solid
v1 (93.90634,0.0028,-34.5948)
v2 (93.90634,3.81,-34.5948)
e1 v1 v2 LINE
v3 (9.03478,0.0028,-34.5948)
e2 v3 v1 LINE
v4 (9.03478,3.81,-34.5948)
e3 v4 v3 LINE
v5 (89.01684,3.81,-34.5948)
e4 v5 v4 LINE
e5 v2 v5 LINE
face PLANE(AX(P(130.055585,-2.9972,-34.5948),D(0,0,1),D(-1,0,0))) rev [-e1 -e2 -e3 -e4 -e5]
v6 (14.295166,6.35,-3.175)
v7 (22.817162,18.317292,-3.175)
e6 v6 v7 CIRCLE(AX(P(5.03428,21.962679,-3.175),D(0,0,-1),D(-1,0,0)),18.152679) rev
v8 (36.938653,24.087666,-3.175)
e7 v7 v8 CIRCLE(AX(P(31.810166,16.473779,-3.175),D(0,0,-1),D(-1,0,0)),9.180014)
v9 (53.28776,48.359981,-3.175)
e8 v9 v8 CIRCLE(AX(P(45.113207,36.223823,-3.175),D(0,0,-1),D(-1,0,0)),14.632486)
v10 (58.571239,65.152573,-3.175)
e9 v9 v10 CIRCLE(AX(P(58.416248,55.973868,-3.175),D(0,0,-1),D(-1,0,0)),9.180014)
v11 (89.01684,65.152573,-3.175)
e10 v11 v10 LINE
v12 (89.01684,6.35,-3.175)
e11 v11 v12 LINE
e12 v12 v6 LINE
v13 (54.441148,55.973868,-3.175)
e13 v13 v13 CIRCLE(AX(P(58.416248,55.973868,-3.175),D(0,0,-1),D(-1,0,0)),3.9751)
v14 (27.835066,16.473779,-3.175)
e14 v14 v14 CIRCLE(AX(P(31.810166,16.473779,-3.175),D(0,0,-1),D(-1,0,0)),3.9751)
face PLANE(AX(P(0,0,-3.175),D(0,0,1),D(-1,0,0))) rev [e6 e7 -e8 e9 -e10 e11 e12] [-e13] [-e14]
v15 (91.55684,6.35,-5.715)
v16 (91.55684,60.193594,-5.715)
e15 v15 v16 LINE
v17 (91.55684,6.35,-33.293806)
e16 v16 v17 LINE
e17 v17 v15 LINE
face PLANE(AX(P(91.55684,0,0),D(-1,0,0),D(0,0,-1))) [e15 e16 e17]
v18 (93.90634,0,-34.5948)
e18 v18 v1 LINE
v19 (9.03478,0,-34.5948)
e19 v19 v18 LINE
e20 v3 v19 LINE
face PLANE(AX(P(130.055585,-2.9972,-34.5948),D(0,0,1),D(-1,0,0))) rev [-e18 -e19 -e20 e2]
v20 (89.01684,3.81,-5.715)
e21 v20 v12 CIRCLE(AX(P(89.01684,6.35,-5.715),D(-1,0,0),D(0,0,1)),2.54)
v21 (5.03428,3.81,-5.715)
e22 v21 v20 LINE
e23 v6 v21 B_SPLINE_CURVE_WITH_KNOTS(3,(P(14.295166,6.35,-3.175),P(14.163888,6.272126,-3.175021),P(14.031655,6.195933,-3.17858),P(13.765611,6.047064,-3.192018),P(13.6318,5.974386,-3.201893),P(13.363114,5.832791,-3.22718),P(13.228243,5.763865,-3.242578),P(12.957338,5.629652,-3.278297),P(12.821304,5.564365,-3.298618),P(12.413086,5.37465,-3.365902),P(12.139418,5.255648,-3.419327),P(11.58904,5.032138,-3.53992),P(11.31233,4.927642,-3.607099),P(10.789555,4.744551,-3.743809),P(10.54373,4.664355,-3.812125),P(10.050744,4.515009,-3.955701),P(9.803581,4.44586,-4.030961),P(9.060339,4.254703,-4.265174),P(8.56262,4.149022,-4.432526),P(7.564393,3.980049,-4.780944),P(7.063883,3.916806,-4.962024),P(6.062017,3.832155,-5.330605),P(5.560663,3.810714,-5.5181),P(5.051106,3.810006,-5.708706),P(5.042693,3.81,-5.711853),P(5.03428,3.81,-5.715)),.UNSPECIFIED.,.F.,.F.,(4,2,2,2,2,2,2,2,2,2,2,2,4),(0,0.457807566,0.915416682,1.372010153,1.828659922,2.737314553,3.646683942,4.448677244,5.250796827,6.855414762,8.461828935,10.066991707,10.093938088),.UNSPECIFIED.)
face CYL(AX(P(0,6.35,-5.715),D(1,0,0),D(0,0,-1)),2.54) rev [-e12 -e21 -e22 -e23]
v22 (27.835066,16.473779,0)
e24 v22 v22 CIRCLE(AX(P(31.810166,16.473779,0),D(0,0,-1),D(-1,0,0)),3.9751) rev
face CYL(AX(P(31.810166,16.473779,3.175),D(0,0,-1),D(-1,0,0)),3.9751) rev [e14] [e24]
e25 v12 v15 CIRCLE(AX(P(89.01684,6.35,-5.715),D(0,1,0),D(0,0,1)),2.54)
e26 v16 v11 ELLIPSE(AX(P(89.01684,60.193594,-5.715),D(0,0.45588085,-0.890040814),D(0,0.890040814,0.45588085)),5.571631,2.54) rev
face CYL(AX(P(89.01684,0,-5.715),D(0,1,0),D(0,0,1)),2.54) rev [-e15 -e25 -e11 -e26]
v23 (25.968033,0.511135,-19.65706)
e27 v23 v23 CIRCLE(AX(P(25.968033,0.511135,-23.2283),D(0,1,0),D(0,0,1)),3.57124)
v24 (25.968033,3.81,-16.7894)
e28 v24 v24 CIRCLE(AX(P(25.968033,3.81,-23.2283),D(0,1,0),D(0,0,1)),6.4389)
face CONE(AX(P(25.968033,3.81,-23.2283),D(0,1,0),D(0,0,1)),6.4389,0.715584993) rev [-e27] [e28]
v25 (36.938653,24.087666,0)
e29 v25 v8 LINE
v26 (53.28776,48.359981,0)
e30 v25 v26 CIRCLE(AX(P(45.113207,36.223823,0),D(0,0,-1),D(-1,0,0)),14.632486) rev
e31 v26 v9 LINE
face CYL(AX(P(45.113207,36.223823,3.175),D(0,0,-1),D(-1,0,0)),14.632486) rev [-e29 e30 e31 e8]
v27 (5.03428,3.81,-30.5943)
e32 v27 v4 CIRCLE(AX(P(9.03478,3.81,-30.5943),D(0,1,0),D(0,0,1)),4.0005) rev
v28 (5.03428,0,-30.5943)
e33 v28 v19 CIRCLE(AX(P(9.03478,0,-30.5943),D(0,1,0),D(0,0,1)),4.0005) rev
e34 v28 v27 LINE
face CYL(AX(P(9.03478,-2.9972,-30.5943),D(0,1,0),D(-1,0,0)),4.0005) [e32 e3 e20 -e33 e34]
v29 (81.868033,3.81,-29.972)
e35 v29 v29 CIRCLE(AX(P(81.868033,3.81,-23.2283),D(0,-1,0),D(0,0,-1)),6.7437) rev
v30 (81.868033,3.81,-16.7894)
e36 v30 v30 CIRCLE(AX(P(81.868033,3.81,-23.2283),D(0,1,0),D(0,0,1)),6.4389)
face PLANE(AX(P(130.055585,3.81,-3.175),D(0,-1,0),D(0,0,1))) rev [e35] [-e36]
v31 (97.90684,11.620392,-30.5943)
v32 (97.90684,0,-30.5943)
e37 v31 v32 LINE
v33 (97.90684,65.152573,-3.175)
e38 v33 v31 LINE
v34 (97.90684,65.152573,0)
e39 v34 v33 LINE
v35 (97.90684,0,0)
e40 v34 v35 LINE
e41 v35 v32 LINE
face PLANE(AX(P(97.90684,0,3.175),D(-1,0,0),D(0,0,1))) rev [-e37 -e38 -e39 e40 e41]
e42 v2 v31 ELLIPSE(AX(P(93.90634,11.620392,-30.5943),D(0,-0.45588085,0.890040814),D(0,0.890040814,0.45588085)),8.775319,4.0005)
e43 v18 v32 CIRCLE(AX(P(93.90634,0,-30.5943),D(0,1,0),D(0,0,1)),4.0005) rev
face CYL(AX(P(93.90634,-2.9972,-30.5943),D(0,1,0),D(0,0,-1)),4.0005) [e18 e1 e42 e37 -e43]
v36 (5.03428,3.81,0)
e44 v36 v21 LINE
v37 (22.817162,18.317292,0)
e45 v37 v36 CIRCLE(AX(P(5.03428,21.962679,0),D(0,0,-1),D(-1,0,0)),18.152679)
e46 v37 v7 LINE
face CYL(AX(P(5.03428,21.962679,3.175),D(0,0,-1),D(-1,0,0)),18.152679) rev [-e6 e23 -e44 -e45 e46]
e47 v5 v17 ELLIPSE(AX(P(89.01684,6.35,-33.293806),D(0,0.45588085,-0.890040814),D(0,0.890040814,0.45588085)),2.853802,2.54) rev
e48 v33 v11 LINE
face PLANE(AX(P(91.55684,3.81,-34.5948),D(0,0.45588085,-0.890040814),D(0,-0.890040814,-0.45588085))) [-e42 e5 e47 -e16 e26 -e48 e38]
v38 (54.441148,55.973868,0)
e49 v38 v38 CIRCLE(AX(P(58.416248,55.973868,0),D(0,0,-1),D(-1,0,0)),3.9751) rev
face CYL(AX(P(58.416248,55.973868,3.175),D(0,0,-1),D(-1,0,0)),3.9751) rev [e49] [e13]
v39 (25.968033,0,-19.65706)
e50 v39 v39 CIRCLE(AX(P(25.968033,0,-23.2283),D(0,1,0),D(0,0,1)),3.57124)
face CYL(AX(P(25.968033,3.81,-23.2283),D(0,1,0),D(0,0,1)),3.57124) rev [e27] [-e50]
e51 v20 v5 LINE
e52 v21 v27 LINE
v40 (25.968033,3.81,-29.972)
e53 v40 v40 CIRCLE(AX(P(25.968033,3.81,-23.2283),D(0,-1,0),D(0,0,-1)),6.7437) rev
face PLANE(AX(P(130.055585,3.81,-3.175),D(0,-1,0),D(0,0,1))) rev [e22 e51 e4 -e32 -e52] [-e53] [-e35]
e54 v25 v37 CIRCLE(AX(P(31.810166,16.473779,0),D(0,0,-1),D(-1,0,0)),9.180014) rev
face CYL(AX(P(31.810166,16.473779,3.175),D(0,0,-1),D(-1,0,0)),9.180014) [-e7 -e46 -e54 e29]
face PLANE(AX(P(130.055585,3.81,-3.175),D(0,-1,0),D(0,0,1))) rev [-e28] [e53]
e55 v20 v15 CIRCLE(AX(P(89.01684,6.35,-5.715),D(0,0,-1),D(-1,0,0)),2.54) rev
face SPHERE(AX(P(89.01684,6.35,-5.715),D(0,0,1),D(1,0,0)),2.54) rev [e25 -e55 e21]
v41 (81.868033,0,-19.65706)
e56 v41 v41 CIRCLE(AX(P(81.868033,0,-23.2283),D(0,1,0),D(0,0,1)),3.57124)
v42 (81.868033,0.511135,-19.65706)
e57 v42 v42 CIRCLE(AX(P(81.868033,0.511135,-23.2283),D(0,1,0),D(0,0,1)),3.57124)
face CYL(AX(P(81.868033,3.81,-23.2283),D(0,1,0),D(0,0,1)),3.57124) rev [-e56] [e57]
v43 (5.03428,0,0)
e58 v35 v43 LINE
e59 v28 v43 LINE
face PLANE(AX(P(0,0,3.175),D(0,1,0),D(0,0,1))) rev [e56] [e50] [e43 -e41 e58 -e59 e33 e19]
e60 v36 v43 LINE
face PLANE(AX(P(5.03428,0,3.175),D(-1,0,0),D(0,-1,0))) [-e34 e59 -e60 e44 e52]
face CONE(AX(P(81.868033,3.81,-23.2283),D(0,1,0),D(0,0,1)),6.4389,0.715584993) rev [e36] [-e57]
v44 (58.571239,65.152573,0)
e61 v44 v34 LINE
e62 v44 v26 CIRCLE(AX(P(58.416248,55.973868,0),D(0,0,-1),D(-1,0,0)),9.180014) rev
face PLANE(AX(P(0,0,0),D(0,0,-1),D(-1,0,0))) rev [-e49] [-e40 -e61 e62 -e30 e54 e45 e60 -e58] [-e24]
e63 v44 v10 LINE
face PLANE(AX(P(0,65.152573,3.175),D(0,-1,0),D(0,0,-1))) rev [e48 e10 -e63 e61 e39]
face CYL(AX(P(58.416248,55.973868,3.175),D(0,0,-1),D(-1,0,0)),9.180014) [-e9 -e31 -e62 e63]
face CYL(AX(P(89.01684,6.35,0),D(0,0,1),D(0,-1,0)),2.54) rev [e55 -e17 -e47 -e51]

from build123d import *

# Parameters (mm, degrees)
SKETCH2_W                                   = 101.6
SKETCH2_H                                   = 127
BOSS_EXTRUDE1_DEPTH                         = 3.175
SKETCH5_R                                   = 3.9751
CUT_EXTRUDE1_DEPTH                          = 3.175
BOSS_EXTRUDE3_DEPTH                         = 92.87256
BOSS_EXTRUDE4_DEPTH                         = 6.35
SKETCH18_R                                  = 3.175
CUT_EXTRUDE3_DEPTH                          = 6.8072
FILLET4_R                                   = 4.0005
CUT_EXTRUDE4_DEPTH                          = 34.5948
CUT_EXTRUDE5_DEPTH                          = 2.9972
FILLET7_R                                   = 2.54
CSK_FOR_1_4_FLAT_HEAD_MACHINE_SCREW_2_COUNT = 2
CSK_FOR_1_4_FLAT_HEAD_MACHINE_SCREW_2_PITCH = 55.9


with BuildPart() as part:
    # Sketch2 → Boss-Extrude1 (new body)
    with BuildSketch(Plane.XY):
        with Locations((50.8, 63.5)):
            Rectangle(SKETCH2_W, SKETCH2_H)
    extrude(amount=BOSS_EXTRUDE1_DEPTH)

    # Sketch5 → Cut-Extrude1 (cut)
    with BuildSketch(Plane(origin=(0, 0, 0), x_dir=(-1, 0, 0), z_dir=(0, 0, -1))):
        with BuildLine():
            Line((-81.586228812, 65.152573183), (-58.571239337, 65.152573183))
            ThreePointArc((-58.571239337, 65.152573183), (-49.65943867, 58.729036089), (-53.287760408, 48.359981104))
            ThreePointArc((-53.287760408, 48.359981104), (-57.249364207, 28.049269577), (-36.93865268, 24.087665778))
            ThreePointArc((-36.93865268, 24.087665778), (-28.337713232, 24.971703827), (-22.817162059, 18.317291951))
            ThreePointArc((-22.817162059, 18.317291951), (-16.509170131, 7.896881921), (-5.03428, 3.81))
            Line((-5.03428, 3.81), (-5.03428, 0))
            Line((-5.03428, 0), (0, 0))
            Line((0, 0), (0, 127))
            Line((0, 127), (-101.6, 127))
            Line((-101.6, 127), (-101.6, 0))
            Line((-101.6, 0), (-97.90684, 0))
            Line((-97.90684, 0), (-97.90684, 65.152573183))
            Line((-97.90684, 65.152573183), (-81.586228812, 65.152573183))
        make_face()
        with Locations((-58.416247506, 55.973867932)):
            Circle(SKETCH5_R)
        with Locations((-31.810165582, 16.473778949)):
            Circle(SKETCH5_R)
    extrude(amount=-CUT_EXTRUDE1_DEPTH, mode=Mode.SUBTRACT)

    # Sketch10 → Boss-Extrude3 (add)
    with BuildSketch(Plane(origin=(5.03428, 0, 0), x_dir=(0, 0, -1), z_dir=(1, 0, 0))):
        Polygon((-3.175, 0), (-4.2418, 0), (-4.2418, -2.9972), (-34.5948, -2.9972), (-34.5948, 0), (-34.5948, 3.81), (-3.175, 3.81), align=None)
    extrude(amount=BOSS_EXTRUDE3_DEPTH)

    # Sketch11 → Boss-Extrude4 (add)
    with BuildSketch(Plane(origin=(97.90684, 0, 0), x_dir=(0, 0, -1), z_dir=(1, 0, 0))):
        Polygon((-3.175, 65.152573183), (-3.175, 3.81), (-34.5948, 3.81), align=None)
    extrude(amount=-BOSS_EXTRUDE4_DEPTH)

    # Sketch18 → Cut-Extrude3 (cut)
    with BuildSketch(Plane.XZ.offset(2.9972)):
        with Locations(Location((25.968032816, 23.228300068, 0), (0, 0, 270))):
            Circle(SKETCH18_R)
        with Locations(Location((81.868032816, 23.228300068, 0), (0, 0, 270))):
            Circle(SKETCH18_R)
    extrude(amount=-CUT_EXTRUDE3_DEPTH, mode=Mode.SUBTRACT)

    # Fillet4
    fillet4_edges = [part.edges().sort_by_distance(p)[0] for p in [
        (97.90684, -1.4986, 4.2418),
        (5.03428, -1.4986, 4.2418),
        (97.90684, 0.4064, 34.5948),
        (5.03428, 0.4064, 34.5948),
    ]]
    fillet(fillet4_edges, radius=FILLET4_R)

    # Mirror5: part across plane


with BuildPart() as part_1:
    add(part.part)
    add(part.part.mirror(Plane.XY))

    # Sketch25 → Cut-Extrude4 (cut)
    with BuildSketch(Plane.XY):
        Polygon((105.475480197, -15.241589329), (106.840773124, 71.833759528), (-8.541984089, 73.642896836), (-9.907277015, -13.432452021), align=None)
    extrude(amount=CUT_EXTRUDE4_DEPTH, mode=Mode.SUBTRACT)

    # Sketch28 → Cut-Extrude5 (cut)
    with BuildSketch(Plane.XZ.offset(2.9972)):
        with BuildLine():
            Line((93.90634, -4.2418), (9.03478, -4.2418))
            ThreePointArc((9.03478, -4.2418), (6.205999322, -5.413519322), (5.03428, -8.2423))
            Line((5.03428, -8.2423), (5.03428, -30.5943))
            ThreePointArc((5.03428, -30.5943), (6.205999322, -33.423080678), (9.03478, -34.5948))
            Line((9.03478, -34.5948), (93.90634, -34.5948))
            ThreePointArc((93.90634, -34.5948), (96.735120678, -33.423080678), (97.90684, -30.5943))
            Line((97.90684, -30.5943), (97.90684, -8.2423))
            ThreePointArc((97.90684, -8.2423), (96.735120678, -5.413519322), (93.90634, -4.2418))
        make_face()
    extrude(amount=-CUT_EXTRUDE5_DEPTH, mode=Mode.SUBTRACT)

    # Fillet7
    # the kernel refuses this fillet: 2.54 mm, written as the material it adds along each edge
    with BuildSketch(Plane(origin=(89.01684, 6.35, -5.715), x_dir=(0, -1, 0), z_dir=(1, 0, 0))) as fillet7_piece_1_section:
        Polygon((0, 0), (FILLET7_R, 0), (FILLET7_R, -FILLET7_R), (0, -FILLET7_R), align=None)
    fillet7_piece_1 = extrude(amount=FILLET7_R, mode=Mode.PRIVATE)
    fillet7_piece_1 = fillet7_piece_1 - Plane(origin=(89.01684, 6.35, -5.715), x_dir=(0, 0.7071067811865475, -0.7071067811865477), z_dir=(1, 0, 0)) * Sphere(FILLET7_R, mode=Mode.PRIVATE)
    add(fillet7_piece_1)
    with BuildSketch(Plane(origin=(5.03428, 3.81, -3.175), x_dir=(0, 0, -1), z_dir=(1, 0, 0))) as fillet7_piece_2_section:
        with BuildLine():
            CenterArc((FILLET7_R, FILLET7_R), FILLET7_R, 180, 90)
            Line((0, FILLET7_R), (0, 0))
            Line((0, 0), (FILLET7_R, 0))
        make_face()
    fillet7_piece_2 = extrude(amount=83.98256, mode=Mode.PRIVATE)
    fillet7_piece_2 = fillet7_piece_2 - Plane(origin=(5.03428, 21.962678524, -3.760034689), x_dir=(0.9796285454928902, -0.20081810888334822, 0), z_dir=(0, 0, -1)) * Cylinder(18.152678524, 179, mode=Mode.PRIVATE)
    add(fillet7_piece_2)
    with BuildSketch(Plane(origin=(91.55684, 3.81, -5.715), x_dir=(-1, 0, 0), z_dir=(0, 0, -1))) as fillet7_piece_3_section:
        with BuildLine():
            CenterArc((FILLET7_R, FILLET7_R), FILLET7_R, 180, 90)
            Line((0, FILLET7_R), (0, 0))
            Line((0, 0), (FILLET7_R, 0))
        make_face()
    fillet7_piece_3 = extrude(amount=28.8798, mode=Mode.PRIVATE)
    fillet7_piece_3 = split(fillet7_piece_3, bisect_by=Plane(origin=(90.978646613, 10.179733651, -31.332208508), z_dir=(0, -0.4558808495345019, 0.8900408142482573)), keep=Keep.TOP, mode=Mode.PRIVATE)
    add(fillet7_piece_3)
    with BuildSketch(Plane(origin=(91.55684, 65.152573183, -3.175), x_dir=(0, 0, -1), z_dir=(0, -1, 0))) as fillet7_piece_4_section:
        with BuildLine():
            CenterArc((FILLET7_R, -FILLET7_R), FILLET7_R, 90, 90)
            Line((0, -FILLET7_R), (0, 0))
            Line((0, 0), (FILLET7_R, 0))
        make_face()
    fillet7_piece_4 = extrude(amount=58.802573183, mode=Mode.PRIVATE)
    fillet7_piece_4 = split(fillet7_piece_4, bisect_by=Plane(origin=(90.975846211, 41.193986982, -15.446640195), z_dir=(0, -0.4558808495345019, 0.8900408142482573)), keep=Keep.TOP, mode=Mode.PRIVATE)
    add(fillet7_piece_4)

    # Sketch35 → CSK for 1/4 Flat Head Machine Screw (100)1 (revolve, cut)
    with BuildSketch(Plane(origin=(25.968032816, 3.81, -23.228300068), x_dir=(0, 0, 1), z_dir=(1, 0, 0))):
        Polygon((0, 0), (0, 3.81), (3.57124, 3.81), (3.57124, 3.298865467), (6.4389, 0), align=None)
    csk_for_1_4_flat_head_machine_screw_100 = revolve(axis=Axis((25.968032816, 10.16, -23.228300068), (0, -1, 0)), mode=Mode.SUBTRACT)

    # CSK for 1_4 Flat Head Machine Screw  2: CSK for 1/4 Flat Head Machine Screw (100)1 ×2
    with Locations(*[(i * CSK_FOR_1_4_FLAT_HEAD_MACHINE_SCREW_2_PITCH, 0, 0) for i in range(1, CSK_FOR_1_4_FLAT_HEAD_MACHINE_SCREW_2_COUNT)]):
        add(csk_for_1_4_flat_head_machine_screw_100, mode=Mode.SUBTRACT)


solid = part_1.part
